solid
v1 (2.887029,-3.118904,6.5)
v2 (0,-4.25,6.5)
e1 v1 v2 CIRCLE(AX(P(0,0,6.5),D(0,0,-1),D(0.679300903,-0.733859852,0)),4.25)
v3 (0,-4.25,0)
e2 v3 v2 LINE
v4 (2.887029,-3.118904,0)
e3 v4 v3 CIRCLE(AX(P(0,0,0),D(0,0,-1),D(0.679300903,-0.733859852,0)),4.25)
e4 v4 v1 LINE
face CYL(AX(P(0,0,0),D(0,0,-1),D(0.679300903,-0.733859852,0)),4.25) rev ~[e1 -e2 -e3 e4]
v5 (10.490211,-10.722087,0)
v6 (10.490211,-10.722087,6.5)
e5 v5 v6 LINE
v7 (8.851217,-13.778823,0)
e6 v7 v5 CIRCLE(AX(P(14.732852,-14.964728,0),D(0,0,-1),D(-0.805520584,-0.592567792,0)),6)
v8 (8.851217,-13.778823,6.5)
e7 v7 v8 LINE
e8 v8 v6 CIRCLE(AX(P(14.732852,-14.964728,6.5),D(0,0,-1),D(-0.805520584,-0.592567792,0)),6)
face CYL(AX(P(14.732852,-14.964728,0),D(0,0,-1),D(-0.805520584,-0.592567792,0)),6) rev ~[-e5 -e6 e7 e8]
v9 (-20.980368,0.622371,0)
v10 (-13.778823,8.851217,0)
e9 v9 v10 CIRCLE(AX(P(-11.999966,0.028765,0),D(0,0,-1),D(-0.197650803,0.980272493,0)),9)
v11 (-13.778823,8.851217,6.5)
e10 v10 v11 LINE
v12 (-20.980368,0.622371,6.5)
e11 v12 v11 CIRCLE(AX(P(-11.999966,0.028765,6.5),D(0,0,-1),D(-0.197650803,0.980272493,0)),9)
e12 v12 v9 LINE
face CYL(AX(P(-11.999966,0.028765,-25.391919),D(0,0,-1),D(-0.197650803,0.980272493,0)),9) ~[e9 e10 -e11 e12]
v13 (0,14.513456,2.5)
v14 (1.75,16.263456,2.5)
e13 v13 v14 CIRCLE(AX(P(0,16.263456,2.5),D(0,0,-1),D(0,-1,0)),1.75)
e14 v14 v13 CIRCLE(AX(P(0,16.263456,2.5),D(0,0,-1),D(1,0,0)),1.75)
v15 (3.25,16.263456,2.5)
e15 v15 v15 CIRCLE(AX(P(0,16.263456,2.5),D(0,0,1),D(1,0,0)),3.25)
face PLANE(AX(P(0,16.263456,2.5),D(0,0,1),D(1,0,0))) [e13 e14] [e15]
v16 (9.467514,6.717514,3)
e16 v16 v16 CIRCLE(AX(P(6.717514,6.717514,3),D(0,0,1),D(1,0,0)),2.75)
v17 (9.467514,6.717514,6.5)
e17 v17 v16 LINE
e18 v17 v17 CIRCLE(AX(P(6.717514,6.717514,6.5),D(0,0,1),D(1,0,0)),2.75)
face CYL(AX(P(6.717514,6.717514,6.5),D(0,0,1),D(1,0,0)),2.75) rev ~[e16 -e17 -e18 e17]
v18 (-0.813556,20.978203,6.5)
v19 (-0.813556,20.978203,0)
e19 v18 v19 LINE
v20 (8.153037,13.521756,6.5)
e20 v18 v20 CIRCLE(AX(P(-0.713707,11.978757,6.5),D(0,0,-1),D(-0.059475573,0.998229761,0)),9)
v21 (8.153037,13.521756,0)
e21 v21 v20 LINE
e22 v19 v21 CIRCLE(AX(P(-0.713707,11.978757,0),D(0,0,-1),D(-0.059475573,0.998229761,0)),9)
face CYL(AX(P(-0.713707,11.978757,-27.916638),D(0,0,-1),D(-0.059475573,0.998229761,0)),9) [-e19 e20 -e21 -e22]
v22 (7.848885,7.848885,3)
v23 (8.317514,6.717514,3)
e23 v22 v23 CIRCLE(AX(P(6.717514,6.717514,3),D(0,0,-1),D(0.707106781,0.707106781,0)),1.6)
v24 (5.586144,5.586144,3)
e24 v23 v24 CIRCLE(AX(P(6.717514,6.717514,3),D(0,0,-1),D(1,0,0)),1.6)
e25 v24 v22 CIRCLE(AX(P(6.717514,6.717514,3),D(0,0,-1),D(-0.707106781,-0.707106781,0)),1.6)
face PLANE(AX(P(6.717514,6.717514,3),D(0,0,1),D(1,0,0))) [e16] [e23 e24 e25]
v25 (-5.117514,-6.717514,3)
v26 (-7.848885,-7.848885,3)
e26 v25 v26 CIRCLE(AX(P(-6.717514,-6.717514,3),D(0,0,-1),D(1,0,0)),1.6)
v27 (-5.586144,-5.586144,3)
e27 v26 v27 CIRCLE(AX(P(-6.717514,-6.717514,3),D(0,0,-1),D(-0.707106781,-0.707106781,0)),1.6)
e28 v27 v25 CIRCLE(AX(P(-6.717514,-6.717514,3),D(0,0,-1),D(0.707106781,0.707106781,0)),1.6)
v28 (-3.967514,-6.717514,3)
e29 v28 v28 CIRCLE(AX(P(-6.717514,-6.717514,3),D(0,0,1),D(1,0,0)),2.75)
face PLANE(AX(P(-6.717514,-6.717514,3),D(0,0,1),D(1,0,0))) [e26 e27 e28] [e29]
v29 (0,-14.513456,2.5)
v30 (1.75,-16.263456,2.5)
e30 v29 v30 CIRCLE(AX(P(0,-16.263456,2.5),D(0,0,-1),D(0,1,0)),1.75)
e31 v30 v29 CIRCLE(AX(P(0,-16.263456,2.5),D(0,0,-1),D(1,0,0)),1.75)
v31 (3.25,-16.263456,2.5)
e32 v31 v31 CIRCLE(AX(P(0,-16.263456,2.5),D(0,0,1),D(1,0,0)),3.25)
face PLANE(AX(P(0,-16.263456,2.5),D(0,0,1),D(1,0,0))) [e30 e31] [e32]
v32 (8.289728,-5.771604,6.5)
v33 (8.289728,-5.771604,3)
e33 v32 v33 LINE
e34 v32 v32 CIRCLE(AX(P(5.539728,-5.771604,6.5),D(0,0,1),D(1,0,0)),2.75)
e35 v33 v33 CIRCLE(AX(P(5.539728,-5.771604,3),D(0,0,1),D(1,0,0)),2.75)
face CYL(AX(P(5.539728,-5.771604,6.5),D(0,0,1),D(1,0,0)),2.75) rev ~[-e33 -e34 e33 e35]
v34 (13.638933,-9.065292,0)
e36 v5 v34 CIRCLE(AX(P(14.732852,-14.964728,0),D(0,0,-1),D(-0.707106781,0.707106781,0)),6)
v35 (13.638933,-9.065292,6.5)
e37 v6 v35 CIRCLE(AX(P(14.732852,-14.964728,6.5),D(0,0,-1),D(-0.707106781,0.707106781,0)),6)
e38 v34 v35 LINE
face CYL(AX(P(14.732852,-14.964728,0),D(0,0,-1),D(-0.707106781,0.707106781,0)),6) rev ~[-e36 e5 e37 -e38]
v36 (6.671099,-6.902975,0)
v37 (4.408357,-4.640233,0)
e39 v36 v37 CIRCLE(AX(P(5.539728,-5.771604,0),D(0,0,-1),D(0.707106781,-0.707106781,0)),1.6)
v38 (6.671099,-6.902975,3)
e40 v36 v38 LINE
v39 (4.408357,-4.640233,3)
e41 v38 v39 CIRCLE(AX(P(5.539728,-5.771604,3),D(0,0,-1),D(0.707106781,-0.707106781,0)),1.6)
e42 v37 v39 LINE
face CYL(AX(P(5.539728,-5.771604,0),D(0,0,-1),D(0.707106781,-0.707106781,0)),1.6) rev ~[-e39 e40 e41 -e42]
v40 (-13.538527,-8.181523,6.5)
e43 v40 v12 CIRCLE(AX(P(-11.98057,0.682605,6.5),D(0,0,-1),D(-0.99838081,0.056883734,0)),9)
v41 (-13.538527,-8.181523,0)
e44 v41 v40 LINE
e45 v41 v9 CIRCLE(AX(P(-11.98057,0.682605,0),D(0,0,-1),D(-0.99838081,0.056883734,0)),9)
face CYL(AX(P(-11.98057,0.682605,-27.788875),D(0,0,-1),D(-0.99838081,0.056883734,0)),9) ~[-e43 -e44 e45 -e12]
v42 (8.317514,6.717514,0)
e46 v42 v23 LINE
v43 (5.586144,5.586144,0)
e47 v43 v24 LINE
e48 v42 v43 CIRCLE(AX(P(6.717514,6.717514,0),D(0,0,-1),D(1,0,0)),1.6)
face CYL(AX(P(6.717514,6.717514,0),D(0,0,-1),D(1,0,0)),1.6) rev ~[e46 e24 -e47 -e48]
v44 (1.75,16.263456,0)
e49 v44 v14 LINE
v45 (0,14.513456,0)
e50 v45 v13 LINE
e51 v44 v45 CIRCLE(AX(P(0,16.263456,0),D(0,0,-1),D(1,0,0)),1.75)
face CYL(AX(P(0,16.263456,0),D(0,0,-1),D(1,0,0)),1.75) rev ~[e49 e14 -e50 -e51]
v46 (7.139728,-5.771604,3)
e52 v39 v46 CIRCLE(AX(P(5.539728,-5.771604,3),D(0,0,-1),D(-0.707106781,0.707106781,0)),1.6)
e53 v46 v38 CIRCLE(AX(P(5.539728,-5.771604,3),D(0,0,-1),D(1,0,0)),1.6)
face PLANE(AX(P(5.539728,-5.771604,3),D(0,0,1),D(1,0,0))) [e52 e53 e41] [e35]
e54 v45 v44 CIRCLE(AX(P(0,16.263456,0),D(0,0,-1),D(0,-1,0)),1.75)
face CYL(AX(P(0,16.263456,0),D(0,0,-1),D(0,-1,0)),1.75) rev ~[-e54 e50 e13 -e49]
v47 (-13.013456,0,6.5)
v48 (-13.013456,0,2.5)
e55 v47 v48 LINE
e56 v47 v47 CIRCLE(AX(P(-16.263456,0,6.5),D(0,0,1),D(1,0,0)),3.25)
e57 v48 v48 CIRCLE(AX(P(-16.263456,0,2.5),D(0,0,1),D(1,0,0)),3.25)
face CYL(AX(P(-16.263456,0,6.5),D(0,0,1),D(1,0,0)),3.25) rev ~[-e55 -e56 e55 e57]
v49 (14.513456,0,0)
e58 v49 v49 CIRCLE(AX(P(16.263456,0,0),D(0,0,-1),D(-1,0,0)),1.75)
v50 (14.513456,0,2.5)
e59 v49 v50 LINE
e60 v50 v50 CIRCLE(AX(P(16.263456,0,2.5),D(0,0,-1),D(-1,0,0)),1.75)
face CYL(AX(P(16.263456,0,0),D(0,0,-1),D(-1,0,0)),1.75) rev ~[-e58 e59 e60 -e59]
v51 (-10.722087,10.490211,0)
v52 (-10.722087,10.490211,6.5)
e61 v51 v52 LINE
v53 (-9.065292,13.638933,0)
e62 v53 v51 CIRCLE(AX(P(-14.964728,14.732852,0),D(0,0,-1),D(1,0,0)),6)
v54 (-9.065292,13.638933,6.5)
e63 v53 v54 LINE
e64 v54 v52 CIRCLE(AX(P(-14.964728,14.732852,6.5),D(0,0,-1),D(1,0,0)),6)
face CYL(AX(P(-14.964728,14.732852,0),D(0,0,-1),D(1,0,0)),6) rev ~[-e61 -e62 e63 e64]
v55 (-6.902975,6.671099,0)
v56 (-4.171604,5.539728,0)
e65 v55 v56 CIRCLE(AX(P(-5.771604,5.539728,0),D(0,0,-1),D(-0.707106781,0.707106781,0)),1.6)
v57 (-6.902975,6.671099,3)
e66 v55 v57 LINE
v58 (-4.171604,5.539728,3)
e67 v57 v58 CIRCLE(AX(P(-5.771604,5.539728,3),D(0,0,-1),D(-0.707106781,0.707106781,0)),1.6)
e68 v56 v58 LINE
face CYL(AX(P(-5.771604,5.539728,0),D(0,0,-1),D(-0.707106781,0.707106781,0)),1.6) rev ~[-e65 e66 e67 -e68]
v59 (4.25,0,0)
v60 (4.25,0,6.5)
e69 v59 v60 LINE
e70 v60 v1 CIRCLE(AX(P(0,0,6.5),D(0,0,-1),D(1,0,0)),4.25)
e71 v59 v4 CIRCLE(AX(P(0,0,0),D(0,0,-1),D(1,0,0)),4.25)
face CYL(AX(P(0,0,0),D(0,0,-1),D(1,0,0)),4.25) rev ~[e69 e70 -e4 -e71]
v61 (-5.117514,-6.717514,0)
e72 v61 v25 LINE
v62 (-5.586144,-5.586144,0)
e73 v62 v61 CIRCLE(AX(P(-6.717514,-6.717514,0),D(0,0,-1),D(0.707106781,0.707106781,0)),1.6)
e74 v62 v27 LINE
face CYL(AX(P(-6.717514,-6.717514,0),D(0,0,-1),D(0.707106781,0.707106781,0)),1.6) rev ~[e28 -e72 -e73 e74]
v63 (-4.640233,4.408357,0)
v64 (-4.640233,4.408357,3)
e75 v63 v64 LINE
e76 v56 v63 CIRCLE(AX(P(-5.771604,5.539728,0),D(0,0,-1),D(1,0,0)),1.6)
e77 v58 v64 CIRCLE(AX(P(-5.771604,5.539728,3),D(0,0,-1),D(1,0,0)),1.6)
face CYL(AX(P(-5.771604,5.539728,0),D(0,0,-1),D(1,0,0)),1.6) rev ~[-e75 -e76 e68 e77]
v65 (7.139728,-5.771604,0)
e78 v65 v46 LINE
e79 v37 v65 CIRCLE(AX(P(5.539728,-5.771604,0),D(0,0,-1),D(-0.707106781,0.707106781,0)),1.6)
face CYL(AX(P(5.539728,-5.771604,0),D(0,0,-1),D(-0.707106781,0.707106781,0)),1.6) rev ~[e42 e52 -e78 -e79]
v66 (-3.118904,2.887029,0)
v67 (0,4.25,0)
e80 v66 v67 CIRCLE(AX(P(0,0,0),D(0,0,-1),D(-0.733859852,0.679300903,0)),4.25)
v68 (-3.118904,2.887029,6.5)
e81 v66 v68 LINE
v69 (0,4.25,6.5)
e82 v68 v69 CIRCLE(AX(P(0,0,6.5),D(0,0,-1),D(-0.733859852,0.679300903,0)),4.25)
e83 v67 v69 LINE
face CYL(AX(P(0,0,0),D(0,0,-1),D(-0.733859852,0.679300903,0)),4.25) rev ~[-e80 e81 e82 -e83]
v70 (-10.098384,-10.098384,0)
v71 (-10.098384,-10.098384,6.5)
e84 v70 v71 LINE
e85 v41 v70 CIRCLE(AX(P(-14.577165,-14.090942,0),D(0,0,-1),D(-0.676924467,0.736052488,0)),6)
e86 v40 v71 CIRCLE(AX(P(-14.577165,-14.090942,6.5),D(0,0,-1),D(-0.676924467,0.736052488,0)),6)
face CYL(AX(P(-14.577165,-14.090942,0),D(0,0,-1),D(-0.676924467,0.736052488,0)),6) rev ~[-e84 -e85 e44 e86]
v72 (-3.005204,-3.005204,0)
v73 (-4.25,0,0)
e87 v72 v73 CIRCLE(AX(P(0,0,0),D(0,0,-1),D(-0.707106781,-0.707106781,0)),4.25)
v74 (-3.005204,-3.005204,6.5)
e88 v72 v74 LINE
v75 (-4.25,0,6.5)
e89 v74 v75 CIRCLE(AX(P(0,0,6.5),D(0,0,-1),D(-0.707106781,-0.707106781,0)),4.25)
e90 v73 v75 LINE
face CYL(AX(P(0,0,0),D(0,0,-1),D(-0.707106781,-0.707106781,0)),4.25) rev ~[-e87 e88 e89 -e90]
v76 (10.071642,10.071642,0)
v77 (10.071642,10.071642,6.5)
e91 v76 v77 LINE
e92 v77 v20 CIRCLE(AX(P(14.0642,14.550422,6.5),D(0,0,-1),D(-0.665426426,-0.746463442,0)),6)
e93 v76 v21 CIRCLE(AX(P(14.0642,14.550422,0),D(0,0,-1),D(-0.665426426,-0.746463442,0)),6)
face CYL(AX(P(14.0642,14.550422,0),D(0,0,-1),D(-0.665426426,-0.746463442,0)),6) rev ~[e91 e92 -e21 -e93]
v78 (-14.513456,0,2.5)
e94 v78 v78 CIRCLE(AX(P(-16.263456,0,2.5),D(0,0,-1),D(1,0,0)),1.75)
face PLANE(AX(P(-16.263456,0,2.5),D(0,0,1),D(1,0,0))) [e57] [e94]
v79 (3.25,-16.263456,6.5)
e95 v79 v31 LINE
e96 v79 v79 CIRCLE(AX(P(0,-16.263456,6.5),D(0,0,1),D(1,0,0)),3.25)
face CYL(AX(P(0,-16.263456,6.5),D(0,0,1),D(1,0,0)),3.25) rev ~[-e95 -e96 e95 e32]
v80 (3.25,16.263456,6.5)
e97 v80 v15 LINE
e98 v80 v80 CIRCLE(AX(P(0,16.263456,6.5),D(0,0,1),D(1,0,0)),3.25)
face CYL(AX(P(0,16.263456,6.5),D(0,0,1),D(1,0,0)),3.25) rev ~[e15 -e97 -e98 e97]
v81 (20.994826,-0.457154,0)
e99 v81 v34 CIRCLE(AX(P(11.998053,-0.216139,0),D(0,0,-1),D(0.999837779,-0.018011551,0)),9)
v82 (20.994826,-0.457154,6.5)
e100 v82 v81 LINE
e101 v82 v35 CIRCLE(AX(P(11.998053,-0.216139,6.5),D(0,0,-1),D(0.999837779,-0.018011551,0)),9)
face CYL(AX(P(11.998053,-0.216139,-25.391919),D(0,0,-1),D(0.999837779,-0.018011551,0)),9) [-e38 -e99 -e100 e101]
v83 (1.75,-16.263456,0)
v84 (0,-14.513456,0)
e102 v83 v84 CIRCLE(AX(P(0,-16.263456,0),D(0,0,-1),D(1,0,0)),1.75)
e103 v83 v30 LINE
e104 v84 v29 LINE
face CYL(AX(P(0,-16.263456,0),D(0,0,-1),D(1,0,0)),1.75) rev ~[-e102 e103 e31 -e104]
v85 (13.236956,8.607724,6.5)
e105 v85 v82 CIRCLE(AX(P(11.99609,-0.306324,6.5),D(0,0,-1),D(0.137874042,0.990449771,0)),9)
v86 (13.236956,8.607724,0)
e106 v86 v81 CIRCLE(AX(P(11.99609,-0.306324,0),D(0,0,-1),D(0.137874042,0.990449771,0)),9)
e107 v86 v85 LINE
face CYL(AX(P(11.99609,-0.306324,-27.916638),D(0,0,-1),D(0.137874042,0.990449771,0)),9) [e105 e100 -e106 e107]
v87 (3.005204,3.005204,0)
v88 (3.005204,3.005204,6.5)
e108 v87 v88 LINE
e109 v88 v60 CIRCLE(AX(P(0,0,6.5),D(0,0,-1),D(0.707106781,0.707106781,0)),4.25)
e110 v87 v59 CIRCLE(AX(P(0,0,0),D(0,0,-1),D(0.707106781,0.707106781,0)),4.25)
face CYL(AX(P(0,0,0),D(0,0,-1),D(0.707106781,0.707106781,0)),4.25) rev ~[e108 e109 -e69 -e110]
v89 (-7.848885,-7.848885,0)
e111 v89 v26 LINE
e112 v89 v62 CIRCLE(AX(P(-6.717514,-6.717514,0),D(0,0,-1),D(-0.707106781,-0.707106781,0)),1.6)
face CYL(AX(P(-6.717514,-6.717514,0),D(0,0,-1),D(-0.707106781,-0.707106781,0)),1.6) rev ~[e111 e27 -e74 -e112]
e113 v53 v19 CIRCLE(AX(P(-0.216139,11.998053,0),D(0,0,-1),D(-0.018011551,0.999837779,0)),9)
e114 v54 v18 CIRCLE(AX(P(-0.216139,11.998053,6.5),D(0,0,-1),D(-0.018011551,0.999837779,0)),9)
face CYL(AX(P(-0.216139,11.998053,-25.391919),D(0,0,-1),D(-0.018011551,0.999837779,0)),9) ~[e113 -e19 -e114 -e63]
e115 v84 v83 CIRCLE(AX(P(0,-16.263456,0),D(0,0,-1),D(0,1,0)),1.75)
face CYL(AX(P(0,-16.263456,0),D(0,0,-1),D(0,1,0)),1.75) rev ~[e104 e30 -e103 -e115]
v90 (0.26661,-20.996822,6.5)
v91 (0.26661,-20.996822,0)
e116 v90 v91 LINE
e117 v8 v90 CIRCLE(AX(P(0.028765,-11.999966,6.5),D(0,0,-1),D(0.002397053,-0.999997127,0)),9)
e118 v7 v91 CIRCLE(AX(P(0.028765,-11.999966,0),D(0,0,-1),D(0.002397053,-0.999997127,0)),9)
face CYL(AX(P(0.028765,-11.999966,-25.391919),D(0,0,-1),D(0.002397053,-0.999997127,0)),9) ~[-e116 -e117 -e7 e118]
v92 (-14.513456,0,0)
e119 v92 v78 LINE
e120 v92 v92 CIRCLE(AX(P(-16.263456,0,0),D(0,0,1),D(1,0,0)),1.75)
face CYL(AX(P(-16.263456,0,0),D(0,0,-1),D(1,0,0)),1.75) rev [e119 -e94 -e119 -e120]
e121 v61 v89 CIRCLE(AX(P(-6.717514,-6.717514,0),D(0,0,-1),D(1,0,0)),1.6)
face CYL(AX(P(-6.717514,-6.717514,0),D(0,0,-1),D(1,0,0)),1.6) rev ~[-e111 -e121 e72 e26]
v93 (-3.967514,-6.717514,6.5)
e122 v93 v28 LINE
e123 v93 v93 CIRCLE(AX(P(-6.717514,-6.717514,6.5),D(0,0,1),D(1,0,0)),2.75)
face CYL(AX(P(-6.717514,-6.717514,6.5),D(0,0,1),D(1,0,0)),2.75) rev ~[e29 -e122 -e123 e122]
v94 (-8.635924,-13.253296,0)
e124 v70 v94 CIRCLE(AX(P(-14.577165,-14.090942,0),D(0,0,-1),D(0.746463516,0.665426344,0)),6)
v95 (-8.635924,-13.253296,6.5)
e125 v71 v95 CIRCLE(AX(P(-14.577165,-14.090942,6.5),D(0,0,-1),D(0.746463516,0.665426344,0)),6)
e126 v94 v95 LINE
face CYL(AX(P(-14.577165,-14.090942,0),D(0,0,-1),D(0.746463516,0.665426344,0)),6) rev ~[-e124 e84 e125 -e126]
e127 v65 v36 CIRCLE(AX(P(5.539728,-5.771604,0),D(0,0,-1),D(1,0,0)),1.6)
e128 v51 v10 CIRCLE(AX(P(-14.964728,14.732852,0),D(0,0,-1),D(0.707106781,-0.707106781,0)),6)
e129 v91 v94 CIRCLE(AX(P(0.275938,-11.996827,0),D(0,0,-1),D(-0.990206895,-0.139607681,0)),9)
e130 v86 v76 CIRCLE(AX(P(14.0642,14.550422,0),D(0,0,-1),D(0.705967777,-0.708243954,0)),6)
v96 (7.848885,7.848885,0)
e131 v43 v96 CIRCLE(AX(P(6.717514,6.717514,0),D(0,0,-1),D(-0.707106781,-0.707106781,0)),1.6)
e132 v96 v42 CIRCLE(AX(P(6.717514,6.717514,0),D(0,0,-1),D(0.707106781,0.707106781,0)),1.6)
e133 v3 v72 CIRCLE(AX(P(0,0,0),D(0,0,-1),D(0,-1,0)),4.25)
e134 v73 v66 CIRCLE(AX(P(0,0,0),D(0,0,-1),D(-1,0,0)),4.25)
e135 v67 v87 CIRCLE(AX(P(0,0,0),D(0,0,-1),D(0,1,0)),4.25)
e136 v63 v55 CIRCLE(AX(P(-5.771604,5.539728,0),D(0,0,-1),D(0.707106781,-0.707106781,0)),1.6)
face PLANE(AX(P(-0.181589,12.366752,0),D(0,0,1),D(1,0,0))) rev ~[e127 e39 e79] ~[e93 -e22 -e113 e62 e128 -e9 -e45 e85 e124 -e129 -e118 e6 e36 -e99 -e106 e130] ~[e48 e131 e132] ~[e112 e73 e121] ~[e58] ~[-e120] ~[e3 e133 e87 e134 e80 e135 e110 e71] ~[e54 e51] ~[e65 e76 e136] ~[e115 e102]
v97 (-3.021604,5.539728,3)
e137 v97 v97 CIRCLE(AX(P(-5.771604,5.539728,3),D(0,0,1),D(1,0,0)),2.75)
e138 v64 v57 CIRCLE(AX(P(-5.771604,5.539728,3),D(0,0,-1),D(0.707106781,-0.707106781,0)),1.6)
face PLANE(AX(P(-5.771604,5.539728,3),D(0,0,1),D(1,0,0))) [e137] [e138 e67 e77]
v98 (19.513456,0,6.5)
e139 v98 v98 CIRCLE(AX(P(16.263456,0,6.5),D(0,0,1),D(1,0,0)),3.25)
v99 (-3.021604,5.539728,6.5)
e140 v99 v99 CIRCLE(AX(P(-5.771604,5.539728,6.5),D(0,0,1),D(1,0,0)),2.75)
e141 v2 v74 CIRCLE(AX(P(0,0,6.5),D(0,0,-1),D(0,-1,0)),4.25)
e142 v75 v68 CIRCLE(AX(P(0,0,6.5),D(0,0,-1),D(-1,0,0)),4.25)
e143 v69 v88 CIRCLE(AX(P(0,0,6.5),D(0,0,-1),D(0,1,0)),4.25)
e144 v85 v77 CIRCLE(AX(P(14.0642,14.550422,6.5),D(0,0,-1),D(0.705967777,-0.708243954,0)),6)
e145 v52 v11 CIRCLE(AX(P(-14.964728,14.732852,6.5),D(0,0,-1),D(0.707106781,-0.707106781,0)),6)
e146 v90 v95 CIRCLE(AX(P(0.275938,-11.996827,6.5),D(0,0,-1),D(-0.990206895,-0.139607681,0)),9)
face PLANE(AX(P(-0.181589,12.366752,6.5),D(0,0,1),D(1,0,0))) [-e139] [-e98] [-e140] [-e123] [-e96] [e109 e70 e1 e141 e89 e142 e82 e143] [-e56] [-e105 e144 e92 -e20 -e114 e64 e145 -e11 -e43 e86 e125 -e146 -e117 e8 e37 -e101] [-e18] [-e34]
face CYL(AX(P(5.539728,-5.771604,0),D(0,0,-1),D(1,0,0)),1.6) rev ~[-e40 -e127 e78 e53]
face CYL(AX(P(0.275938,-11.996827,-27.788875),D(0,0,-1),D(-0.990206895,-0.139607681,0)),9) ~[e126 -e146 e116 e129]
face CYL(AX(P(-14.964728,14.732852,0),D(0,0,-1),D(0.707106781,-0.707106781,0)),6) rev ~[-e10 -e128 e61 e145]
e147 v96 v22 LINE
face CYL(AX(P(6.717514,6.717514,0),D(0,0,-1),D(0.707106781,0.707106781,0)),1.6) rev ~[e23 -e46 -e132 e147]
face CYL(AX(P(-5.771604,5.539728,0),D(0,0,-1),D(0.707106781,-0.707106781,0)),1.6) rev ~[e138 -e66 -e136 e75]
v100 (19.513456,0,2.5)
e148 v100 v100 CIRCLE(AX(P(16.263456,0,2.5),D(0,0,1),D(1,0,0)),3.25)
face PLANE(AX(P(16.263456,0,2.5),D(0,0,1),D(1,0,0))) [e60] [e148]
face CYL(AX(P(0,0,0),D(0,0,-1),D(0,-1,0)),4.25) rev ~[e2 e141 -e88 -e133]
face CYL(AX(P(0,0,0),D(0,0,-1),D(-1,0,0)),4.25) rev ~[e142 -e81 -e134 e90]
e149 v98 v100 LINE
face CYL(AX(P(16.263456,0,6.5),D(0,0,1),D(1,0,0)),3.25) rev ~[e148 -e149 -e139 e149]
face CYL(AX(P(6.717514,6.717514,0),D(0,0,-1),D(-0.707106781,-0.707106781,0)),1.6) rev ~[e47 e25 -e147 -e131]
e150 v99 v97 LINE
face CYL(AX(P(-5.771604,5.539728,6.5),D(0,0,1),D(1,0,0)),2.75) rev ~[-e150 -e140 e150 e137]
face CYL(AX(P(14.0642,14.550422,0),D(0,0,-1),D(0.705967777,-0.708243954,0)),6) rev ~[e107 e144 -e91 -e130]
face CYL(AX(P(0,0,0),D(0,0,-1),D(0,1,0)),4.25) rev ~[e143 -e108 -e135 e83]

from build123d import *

# Parameters (mm, degrees)
F2_R        = 1.75
F3_DEPTH    = 6.5
F4_R        = 2.75
F5_DEPTH    = 3.5
F6_T1_DEPTH = 57.2838374918
F6_T3_DEPTH = 62.3332762367
F6_T5_DEPTH = 62.0777502529
F7_R        = 3.25
F8_DEPTH    = 4


# Not quite as in the source:
# - a fillet or chamfer that OpenCascade refuses, or shapes differently, is made with other operations: its cross-section is extruded or revolved along the edge and cut away or added


with BuildPart() as f3:
    # F2 (on Top) → F3 (new body)
    with BuildSketch(Plane.XY):
        with BuildLine():
            ThreePointArc((-3.1189043715, 2.8870288397), (-1.7018559621, 3.894378806), (0, 4.25))
            ThreePointArc((0, 4.25), (1.6264045876, 3.9264880132), (3.00520382, 3.00520382))
            Line((3.00520382, 3.00520382), (5.5861435714, 5.5861435714))
            ThreePointArc((5.5861435714, 5.5861435714), (5.5861435714, 7.8488852712), (7.8488852712, 7.8488852712))
            Line((7.8488852712, 7.8488852712), (10.0716416635, 10.0716416635))
            ThreePointArc((10.0716416635, 10.0716416635), (8.0706751581, 14.271751719), (9.6732808742, 18.6394108579))
            ThreePointArc((9.6732808742, 18.6394108579), (-0.2919239613, 20.9979708639), (-10.1877103957, 18.3632937376))
            ThreePointArc((-10.1877103957, 18.3632937376), (-9.2786875084, 16.6483019778), (-8.9647275629, 14.732852031))
            ThreePointArc((-8.9647275629, 14.732852031), (-9.4214503678, 12.4367514369), (-10.7220868758, 10.4902113439))
            Line((-10.7220868758, 10.4902113439), (-6.9029746628, 6.6710991309))
            ThreePointArc((-6.9029746628, 6.6710991309), (-5.1593103211, 7.017935533), (-4.1716038129, 5.539728281))
            ThreePointArc((-4.1716038129, 5.539728281), (-4.2933965608, 4.9274347892), (-4.640232963, 4.4083574311))
            Line((-4.640232963, 4.4083574311), (-3.1189043715, 2.8870288397))
        make_face()
        with BuildLine():
            ThreePointArc((0, 14.5134559673), (-1.2374368671, 17.5008928344), (1.75, 16.2634559673))
            ThreePointArc((1.75, 16.2634559673), (1.2374368671, 15.0260191002), (0, 14.5134559673))
        make_face(mode=Mode.SUBTRACT)
        with BuildLine():
            ThreePointArc((-4.25, 0), (-3.9571355536, 1.5503477708), (-3.1189043715, 2.8870288397))
            Line((-3.1189043715, 2.8870288397), (-4.640232963, 4.4083574311))
            ThreePointArc((-4.640232963, 4.4083574311), (-6.9029746628, 4.4083574311), (-6.9029746628, 6.6710991309))
            Line((-6.9029746628, 6.6710991309), (-10.7220868758, 10.4902113439))
            ThreePointArc((-10.7220868758, 10.4902113439), (-14.5116932272, 8.7499798202), (-18.5201343168, 9.899728526))
            ThreePointArc((-18.5201343168, 9.899728526), (-20.9996146914, 0.1272116798), (-18.6387120488, -9.674627288))
            ThreePointArc((-18.6387120488, -9.674627288), (-14.279821029, -8.0983145468), (-10.0983841523, -10.0983841523))
            Line((-10.0983841523, -10.0983841523), (-7.8488852712, -7.8488852712))
            ThreePointArc((-7.8488852712, -7.8488852712), (-7.8488852712, -5.5861435714), (-5.5861435714, -5.5861435714))
            Line((-5.5861435714, -5.5861435714), (-3.00520382, -3.00520382))
            ThreePointArc((-3.00520382, -3.00520382), (-3.9264880132, -1.6264045876), (-4.25, 0))
        make_face()
        with Locations((-16.2634559673, 0)):
            Circle(F2_R, mode=Mode.SUBTRACT)
        with BuildLine():
            Line((5.5861435714, 5.5861435714), (3.00520382, 3.00520382))
            ThreePointArc((3.00520382, 3.00520382), (3.9264880132, 1.6264045876), (4.25, 0))
            ThreePointArc((4.25, 0), (3.894378806, -1.7018559621), (2.8870288397, -3.1189043715))
            Line((2.8870288397, -3.1189043715), (4.4083574311, -4.640232963))
            ThreePointArc((4.4083574311, -4.640232963), (6.1520217728, -4.2933965608), (7.139728281, -5.7716038129))
            ThreePointArc((7.139728281, -5.7716038129), (7.017935533, -6.3838973046), (6.6710991309, -6.9029746628))
            Line((6.6710991309, -6.9029746628), (10.4902113439, -10.7220868758))
            ThreePointArc((10.4902113439, -10.7220868758), (14.3265437078, -8.9785005753), (18.3632937376, -10.1877103957))
            ThreePointArc((18.3632937376, -10.1877103957), (20.3301397989, -5.2616932403), (21, 0))
            ThreePointArc((21, 0), (20.3137902, 5.3244650163), (18.3000068848, 10.3009585969))
            ThreePointArc((18.3000068848, 10.3009585969), (14.2313497781, 8.552751018), (10.0716416635, 10.0716416635))
            Line((10.0716416635, 10.0716416635), (7.8488852712, 7.8488852712))
            ThreePointArc((7.8488852712, 7.8488852712), (8.1957216733, 7.3298079131), (8.3175144213, 6.7175144213))
            ThreePointArc((8.3175144213, 6.7175144213), (7.3298079131, 5.2393071693), (5.5861435714, 5.5861435714))
        make_face()
        with BuildLine():
            ThreePointArc((18.0134559673, 0), (16.2634559673, -1.75), (14.5134559673, 0))
            ThreePointArc((14.5134559673, 0), (16.2634559673, 1.75), (18.0134559673, 0))
        make_face(mode=Mode.SUBTRACT)
        with BuildLine():
            Line((4.4083574311, -4.640232963), (2.8870288397, -3.1189043715))
            ThreePointArc((2.8870288397, -3.1189043715), (1.5503477708, -3.9571355536), (0, -4.25))
            ThreePointArc((0, -4.25), (-1.6264045876, -3.9264880132), (-3.00520382, -3.00520382))
            Line((-3.00520382, -3.00520382), (-5.5861435714, -5.5861435714))
            ThreePointArc((-5.5861435714, -5.5861435714), (-5.2393071693, -6.1052209295), (-5.1175144213, -6.7175144213))
            ThreePointArc((-5.1175144213, -6.7175144213), (-6.1052209295, -8.1957216733), (-7.8488852712, -7.8488852712))
            Line((-7.8488852712, -7.8488852712), (-10.0983841523, -10.0983841523))
            ThreePointArc((-10.0983841523, -10.0983841523), (-8.9703530251, -11.9546705323), (-8.577165246, -14.0909422189))
            ThreePointArc((-8.577165246, -14.0909422189), (-9.024856678, -16.365116699), (-10.301121768, -18.2999150359))
            ThreePointArc((-10.301121768, -18.2999150359), (-0.2289175978, -20.9987522661), (9.899728526, -18.5201343168))
            ThreePointArc((9.899728526, -18.5201343168), (8.7499798202, -14.5116932272), (10.4902113439, -10.7220868758))
            Line((10.4902113439, -10.7220868758), (6.6710991309, -6.9029746628))
            ThreePointArc((6.6710991309, -6.9029746628), (4.4083574311, -6.9029746628), (4.4083574311, -4.640232963))
        make_face()
        with BuildLine():
            ThreePointArc((1.75, -16.2634559673), (-1.2374368671, -17.5008928344), (0, -14.5134559673))
            ThreePointArc((0, -14.5134559673), (1.2374368671, -15.0260191002), (1.75, -16.2634559673))
        make_face(mode=Mode.SUBTRACT)
    extrude(amount=F3_DEPTH)

    # F4 (on face) → F5 (cut)
    with BuildSketch(Plane.XY.offset(6.5)):
        with Locations((-5.7716038129, 5.539728281)):
            Circle(F4_R)
        with Locations((5.539728281, -5.7716038129)):
            Circle(F4_R)
        with Locations((-6.7175144213, -6.7175144213)):
            Circle(F4_R)
        with Locations((6.7175144213, 6.7175144213)):
            Circle(F4_R)
    extrude(amount=-F5_DEPTH, mode=Mode.SUBTRACT)

    # F6: fillet of radius 9 on 8 edges, made by hand

    # F6_s2 → F6_t1 (cut)
    with BuildSketch(Plane.XY.offset(-25.3919187459)):
        with BuildLine():
            ThreePointArc((-0.3782425644, 20.9965933561), (-6.0328802021, 18.8657689221), (-9.065291981, 13.6389325572))
            ThreePointArc((-9.065291981, 13.6389325572), (-9.1272145679, 16.1197341578), (-10.1877103957, 18.3632937376))
            ThreePointArc((-10.1877103957, 18.3632937376), (-5.4445759439, 20.2819277385), (-0.3782425644, 20.9965933561))
        make_face()
        with BuildLine():
            ThreePointArc((20.9965933561, -0.3782425644), (18.8657689221, -6.0328802021), (13.6389325572, -9.065291981))
            ThreePointArc((13.6389325572, -9.065291981), (16.1197341578, -9.1272145679), (18.3632937376, -10.1877103957))
            ThreePointArc((18.3632937376, -10.1877103957), (20.2819277385, -5.4445759439), (20.9965933561, -0.3782425644))
        make_face()
        with BuildLine():
            ThreePointArc((-13.7788227476, 8.8512170739), (-18.9576712537, 5.7375588181), (-20.9999396683, 0.0503381168))
            ThreePointArc((-20.9999396683, 0.0503381168), (-20.3644711398, 5.1272131997), (-18.5201343168, 9.899728526))
            ThreePointArc((-18.5201343168, 9.899728526), (-16.2602888025, 8.8743948046), (-13.7788227476, 8.8512170739))
        make_face()
        with BuildLine():
            ThreePointArc((0.0503381168, -20.9999396683), (5.7375588181, -18.9576712537), (8.8512170739, -13.7788227476))
            ThreePointArc((8.8512170739, -13.7788227476), (8.8743948046, -16.2602888025), (9.899728526, -18.5201343168))
            ThreePointArc((9.899728526, -18.5201343168), (5.1272131997, -20.3644711398), (0.0503381168, -20.9999396683))
        make_face()
    extrude(amount=F6_T1_DEPTH, mode=Mode.SUBTRACT)

    # F6_s4 → F6_t3 (cut)
    with BuildSketch(Plane.XY.offset(-27.9166381183)):
        with BuildLine():
            ThreePointArc((-1.2489870314, 20.962824986), (4.8716041748, 19.0359733336), (8.1530373835, 13.5217562449))
            ThreePointArc((8.1530373835, 13.5217562449), (8.3126072664, 16.2589826676), (9.6732808742, 18.6394108579))
            ThreePointArc((9.6732808742, 18.6394108579), (4.3694101421, 20.5404054247), (-1.2489870314, 20.962824986))
        make_face()
        with BuildLine():
            ThreePointArc((13.2369559696, 8.6077236934), (18.8594743215, 5.515526839), (20.993156783, -0.5360674268))
            ThreePointArc((20.993156783, -0.5360674268), (20.3800996321, 5.0647348385), (18.3000068848, 10.3009585969))
            ThreePointArc((18.3000068848, 10.3009585969), (15.9671809198, 8.8601969743), (13.2369559696, 8.6077236934))
        make_face()
    extrude(amount=F6_T3_DEPTH, mode=Mode.SUBTRACT)

    # F6_s6 → F6_t5 (cut)
    with BuildSketch(Plane.XY.offset(-27.7888751265)):
        with BuildLine():
            ThreePointArc((-8.6359238746, -13.2532961322), (-5.5485972344, -18.85793385), (0.4828918194, -20.9944472538))
            ThreePointArc((0.4828918194, -20.9944472538), (-5.090632161, -20.3736463158), (-10.301121768, -18.2999150359))
            ThreePointArc((-10.301121768, -18.2999150359), (-8.8793307439, -15.9710172139), (-8.6359238746, -13.2532961322))
        make_face()
        with BuildLine():
            ThreePointArc((-20.9659970002, 1.1945584074), (-19.0352466943, -4.9059131307), (-13.5385270334, -8.1815234096))
            ThreePointArc((-13.5385270334, -8.1815234096), (-16.2629392178, -8.3326294351), (-18.6387120488, -9.674627288))
            ThreePointArc((-18.6387120488, -9.674627288), (-20.5345573153, -4.3968120117), (-20.9659970002, 1.1945584074))
        make_face()
    extrude(amount=F6_T5_DEPTH, mode=Mode.SUBTRACT)

    # F7 (on face) → F8 (cut)
    with BuildSketch(Plane.XY.offset(6.5)):
        with Locations((-16.2634559673, 0)):
            Circle(F7_R)
        with Locations((0, 16.2634559673)):
            Circle(F7_R)
        with Locations((16.2634559673, 0)):
            Circle(F7_R)
        with Locations((0, -16.2634559673)):
            Circle(F7_R)
    extrude(amount=-F8_DEPTH, mode=Mode.SUBTRACT)


solid = f3.part
